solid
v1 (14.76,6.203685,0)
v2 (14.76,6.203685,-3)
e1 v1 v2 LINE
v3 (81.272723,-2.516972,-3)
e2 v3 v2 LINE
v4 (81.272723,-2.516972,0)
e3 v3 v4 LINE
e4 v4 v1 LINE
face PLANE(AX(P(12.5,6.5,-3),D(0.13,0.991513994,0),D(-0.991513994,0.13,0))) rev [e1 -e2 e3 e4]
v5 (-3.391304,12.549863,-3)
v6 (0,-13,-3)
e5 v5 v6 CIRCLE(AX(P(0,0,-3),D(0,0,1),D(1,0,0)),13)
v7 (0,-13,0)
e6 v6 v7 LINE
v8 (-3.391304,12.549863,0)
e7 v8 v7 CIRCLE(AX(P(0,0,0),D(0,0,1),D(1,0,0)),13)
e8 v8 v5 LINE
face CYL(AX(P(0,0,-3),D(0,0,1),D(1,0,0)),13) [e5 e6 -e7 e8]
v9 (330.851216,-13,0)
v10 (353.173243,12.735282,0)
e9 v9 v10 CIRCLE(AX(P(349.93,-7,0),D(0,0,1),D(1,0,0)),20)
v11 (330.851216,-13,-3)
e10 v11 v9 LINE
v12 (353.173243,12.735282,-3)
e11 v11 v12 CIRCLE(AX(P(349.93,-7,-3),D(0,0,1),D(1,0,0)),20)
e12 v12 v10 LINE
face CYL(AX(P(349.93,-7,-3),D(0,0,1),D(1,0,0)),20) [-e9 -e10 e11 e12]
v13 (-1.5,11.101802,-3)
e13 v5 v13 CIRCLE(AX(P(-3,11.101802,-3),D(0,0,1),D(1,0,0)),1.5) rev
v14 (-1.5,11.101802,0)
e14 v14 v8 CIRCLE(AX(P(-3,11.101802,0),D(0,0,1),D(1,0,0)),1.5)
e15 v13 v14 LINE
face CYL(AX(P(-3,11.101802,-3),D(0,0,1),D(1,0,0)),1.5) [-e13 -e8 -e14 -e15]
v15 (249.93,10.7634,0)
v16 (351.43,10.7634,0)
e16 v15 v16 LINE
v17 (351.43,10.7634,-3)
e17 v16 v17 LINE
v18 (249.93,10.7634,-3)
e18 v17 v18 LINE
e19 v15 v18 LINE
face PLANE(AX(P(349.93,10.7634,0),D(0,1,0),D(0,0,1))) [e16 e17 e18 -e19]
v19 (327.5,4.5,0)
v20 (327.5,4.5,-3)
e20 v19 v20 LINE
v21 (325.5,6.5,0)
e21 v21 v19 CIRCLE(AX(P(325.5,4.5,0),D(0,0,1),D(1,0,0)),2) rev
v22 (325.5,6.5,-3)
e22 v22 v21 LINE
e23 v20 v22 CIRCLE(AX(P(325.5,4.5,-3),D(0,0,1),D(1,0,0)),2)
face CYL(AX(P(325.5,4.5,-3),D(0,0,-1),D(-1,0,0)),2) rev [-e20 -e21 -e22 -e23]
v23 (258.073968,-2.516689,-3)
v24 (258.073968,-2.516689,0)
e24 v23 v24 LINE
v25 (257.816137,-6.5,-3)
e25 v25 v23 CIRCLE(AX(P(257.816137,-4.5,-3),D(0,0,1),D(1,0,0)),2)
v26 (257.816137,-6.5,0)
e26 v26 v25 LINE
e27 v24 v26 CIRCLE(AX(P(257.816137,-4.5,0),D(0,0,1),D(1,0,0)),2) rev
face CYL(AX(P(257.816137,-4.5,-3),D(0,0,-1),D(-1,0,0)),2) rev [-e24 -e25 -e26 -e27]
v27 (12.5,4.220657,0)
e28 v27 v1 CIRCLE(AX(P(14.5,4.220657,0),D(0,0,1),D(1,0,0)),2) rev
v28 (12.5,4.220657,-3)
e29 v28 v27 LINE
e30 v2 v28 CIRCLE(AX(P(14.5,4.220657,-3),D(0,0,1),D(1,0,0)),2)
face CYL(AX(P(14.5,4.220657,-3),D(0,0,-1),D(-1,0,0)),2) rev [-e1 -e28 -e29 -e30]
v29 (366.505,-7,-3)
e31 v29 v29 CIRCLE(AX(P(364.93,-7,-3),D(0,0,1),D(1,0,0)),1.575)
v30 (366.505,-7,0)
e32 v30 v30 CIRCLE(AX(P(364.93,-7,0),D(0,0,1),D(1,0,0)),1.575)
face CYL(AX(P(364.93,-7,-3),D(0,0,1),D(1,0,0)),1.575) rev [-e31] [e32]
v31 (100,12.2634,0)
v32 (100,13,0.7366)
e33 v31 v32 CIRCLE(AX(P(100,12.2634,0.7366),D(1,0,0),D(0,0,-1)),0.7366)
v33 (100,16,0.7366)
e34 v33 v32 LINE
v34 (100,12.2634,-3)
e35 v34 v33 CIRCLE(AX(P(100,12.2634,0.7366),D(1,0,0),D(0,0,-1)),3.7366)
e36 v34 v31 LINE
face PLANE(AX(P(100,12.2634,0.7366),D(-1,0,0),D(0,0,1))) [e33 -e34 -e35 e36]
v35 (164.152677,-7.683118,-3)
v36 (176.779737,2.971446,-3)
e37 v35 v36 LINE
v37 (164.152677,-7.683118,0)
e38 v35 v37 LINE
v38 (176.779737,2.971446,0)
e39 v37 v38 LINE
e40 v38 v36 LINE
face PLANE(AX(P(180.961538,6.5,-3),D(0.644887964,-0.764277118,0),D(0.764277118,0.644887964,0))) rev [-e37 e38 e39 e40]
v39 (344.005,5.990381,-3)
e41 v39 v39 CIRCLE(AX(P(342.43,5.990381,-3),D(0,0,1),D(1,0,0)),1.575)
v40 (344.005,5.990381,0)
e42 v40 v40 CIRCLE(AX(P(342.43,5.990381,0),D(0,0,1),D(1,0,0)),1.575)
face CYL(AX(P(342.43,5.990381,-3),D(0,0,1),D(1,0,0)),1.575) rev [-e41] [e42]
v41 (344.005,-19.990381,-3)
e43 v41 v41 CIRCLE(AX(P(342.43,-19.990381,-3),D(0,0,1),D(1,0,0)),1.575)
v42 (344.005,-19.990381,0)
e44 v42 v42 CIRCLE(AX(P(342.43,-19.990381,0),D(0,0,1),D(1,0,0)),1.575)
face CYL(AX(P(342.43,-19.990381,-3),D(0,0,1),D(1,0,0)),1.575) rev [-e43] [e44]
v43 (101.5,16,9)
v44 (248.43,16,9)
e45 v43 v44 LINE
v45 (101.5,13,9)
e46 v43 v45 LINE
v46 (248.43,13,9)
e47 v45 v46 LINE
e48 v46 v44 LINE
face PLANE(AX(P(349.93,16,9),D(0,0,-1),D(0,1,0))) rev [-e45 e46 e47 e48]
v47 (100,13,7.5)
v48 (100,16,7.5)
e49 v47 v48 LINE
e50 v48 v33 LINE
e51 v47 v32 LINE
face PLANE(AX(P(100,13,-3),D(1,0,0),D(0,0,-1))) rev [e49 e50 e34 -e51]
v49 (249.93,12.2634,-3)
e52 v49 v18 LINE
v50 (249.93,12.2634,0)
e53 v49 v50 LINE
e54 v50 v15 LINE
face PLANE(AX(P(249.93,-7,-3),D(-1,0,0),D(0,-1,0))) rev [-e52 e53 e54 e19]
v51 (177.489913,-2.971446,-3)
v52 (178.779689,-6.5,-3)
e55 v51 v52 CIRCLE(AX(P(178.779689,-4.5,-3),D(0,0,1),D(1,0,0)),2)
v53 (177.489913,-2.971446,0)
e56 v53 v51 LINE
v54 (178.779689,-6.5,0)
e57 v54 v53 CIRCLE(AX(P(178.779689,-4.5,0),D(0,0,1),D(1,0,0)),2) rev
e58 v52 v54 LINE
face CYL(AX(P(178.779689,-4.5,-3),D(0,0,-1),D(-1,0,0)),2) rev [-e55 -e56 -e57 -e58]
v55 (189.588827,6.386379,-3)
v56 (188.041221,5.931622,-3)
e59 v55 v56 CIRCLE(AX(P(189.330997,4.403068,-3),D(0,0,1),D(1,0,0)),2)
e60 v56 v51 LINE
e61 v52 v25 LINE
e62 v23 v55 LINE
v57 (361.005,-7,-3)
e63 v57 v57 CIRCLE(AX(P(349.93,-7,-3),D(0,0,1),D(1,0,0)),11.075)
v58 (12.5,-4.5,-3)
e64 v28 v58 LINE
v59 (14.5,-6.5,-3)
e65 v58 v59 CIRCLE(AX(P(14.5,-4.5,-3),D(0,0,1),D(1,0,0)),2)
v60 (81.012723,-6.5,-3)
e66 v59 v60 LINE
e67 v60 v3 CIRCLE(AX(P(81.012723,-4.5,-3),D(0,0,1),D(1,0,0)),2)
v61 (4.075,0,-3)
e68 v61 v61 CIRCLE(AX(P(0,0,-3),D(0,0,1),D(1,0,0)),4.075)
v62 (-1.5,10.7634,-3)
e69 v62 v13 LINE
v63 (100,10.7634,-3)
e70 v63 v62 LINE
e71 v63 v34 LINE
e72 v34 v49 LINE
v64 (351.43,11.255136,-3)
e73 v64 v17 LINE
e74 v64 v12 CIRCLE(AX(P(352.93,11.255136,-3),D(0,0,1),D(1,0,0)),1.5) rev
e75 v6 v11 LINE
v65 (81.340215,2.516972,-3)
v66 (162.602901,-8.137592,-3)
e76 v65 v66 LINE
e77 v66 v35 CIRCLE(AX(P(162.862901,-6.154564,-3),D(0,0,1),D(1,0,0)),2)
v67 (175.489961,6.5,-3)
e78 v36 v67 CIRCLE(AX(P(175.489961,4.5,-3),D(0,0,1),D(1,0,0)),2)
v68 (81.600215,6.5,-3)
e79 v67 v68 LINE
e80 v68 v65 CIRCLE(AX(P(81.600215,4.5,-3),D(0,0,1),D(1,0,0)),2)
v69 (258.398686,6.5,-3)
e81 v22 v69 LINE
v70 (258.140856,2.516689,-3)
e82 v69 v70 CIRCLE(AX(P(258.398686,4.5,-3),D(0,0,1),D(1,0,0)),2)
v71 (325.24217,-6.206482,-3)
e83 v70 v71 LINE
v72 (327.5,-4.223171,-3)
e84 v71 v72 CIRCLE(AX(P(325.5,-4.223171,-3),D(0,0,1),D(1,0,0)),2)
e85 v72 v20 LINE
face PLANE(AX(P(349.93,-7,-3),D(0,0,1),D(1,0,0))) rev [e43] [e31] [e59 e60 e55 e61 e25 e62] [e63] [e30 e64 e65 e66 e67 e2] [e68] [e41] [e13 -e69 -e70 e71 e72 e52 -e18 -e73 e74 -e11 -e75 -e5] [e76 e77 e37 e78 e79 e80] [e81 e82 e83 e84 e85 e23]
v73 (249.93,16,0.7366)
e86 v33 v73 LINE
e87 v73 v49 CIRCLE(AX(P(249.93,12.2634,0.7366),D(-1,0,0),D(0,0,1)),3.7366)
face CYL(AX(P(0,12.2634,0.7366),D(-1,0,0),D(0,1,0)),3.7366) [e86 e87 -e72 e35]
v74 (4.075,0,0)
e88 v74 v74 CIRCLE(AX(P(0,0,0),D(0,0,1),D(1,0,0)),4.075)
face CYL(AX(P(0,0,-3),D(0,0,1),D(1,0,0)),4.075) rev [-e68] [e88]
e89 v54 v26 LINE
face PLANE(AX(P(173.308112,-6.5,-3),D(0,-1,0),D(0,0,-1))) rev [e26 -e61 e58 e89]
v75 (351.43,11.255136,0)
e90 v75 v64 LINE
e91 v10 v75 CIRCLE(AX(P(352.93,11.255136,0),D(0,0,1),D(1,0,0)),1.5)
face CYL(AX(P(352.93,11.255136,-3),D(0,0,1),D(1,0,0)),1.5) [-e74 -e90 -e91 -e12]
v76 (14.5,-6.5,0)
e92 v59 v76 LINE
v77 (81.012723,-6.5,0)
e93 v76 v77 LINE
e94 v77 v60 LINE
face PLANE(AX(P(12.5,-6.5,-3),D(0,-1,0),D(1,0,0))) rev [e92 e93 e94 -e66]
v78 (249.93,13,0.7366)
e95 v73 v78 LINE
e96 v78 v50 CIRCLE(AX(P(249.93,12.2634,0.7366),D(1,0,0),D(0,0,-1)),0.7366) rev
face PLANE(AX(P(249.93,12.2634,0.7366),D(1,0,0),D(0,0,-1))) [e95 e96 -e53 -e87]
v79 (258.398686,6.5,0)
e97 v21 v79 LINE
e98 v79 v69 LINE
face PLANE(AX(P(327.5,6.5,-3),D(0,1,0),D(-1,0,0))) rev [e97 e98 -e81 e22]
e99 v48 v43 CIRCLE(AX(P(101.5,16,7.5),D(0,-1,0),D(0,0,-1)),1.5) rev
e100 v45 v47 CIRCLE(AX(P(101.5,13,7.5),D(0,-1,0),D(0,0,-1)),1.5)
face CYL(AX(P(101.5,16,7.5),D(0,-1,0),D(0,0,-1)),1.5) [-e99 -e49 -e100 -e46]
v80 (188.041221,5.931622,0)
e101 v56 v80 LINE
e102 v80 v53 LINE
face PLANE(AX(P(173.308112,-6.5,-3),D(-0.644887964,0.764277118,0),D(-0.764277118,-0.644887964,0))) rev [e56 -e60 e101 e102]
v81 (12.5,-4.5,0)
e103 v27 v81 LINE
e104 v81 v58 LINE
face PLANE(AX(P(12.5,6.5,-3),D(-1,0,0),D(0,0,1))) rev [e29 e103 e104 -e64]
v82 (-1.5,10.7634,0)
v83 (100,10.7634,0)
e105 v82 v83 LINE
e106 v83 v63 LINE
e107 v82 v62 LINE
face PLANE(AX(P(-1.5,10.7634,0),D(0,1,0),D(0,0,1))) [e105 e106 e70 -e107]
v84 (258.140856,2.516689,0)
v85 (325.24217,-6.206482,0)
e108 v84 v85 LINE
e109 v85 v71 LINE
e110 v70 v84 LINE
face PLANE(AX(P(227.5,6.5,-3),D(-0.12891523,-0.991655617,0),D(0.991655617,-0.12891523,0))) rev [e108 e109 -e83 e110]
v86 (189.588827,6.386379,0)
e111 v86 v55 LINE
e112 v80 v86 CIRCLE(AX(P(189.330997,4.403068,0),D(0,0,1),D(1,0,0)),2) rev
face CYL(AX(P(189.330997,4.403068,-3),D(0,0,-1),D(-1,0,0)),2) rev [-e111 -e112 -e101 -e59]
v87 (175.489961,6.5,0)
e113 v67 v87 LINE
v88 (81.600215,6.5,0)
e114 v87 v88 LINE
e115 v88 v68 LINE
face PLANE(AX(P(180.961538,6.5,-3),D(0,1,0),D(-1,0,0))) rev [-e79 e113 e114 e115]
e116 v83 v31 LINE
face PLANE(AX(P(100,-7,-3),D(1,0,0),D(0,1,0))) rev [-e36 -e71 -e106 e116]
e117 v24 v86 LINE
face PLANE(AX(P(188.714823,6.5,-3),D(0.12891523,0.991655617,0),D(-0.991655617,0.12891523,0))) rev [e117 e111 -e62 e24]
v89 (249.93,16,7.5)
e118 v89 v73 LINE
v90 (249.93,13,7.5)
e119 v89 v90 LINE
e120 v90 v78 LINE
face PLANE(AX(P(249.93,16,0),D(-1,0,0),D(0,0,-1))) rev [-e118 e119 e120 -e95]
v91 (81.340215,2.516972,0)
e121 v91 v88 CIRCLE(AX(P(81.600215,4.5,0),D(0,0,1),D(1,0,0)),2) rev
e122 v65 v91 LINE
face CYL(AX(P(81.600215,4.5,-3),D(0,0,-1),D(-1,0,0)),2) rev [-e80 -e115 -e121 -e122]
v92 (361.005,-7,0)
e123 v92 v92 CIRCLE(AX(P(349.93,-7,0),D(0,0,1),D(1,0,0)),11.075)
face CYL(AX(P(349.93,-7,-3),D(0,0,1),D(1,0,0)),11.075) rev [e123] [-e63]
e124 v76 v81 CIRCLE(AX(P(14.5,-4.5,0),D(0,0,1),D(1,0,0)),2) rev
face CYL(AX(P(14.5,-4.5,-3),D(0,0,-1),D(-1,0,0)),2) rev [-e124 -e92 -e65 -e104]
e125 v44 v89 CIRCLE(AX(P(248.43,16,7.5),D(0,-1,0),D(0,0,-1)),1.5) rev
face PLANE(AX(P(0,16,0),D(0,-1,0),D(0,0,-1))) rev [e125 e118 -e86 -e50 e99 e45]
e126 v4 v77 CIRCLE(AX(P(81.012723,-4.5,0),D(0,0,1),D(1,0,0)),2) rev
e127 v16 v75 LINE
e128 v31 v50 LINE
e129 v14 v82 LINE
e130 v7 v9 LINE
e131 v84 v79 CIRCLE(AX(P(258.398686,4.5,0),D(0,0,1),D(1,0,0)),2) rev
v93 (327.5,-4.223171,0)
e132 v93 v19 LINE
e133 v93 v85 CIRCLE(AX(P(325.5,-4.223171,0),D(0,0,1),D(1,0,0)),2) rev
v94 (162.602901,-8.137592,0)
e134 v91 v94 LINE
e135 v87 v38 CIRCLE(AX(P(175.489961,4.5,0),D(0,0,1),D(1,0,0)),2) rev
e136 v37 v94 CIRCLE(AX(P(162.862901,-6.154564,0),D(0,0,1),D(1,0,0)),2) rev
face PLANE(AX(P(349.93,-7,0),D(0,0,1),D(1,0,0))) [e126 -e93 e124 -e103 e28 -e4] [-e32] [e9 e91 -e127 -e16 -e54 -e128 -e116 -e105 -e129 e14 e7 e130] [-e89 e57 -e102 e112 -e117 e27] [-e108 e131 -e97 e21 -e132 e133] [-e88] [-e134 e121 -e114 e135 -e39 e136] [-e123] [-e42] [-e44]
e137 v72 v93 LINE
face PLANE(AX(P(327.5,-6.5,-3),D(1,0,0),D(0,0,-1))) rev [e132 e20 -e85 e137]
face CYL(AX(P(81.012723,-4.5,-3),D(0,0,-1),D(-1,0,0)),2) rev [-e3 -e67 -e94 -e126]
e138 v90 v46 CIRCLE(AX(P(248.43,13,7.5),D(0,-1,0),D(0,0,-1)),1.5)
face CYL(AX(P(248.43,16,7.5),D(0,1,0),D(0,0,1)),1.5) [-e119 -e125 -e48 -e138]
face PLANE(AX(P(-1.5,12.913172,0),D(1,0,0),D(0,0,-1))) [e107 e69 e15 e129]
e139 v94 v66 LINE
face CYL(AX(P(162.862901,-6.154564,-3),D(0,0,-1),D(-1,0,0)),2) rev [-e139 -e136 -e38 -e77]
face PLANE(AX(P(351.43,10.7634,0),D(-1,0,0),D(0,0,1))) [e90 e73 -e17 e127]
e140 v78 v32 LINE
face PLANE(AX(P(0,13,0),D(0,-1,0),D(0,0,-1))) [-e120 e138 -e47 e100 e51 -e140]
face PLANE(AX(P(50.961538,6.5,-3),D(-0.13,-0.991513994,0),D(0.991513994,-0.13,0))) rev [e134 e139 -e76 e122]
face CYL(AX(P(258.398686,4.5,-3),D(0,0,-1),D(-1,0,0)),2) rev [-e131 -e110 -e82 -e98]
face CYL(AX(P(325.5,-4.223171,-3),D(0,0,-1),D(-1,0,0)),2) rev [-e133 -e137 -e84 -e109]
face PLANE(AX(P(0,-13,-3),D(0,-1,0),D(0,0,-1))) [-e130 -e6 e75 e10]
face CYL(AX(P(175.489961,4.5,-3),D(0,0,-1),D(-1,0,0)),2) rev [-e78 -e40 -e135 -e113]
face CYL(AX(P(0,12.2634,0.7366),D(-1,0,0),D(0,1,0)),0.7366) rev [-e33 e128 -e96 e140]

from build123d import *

# Parameters (mm, degrees)
BASE_FLANGE1_DEPTH            = 3
EDGE_FLANGE2_STRIP_W          = 13.4732
EDGE_FLANGE2_STRIP_H          = 3
EDGE_FLANGE2_STRIP_CUT_DEPTH  = 349.93
EDGE_FLANGE2_RELIEF_W         = 14.9732
EDGE_FLANGE2_RELIEF_H         = 1.5
EDGE_FLANGE2_RELIEF_CUT_DEPTH = 3
EDGE_FLANGE2_DEPTH            = 349.93
CUT_EXTRUDE1_DEPTH            = 372.023186472
CUT_EXTRUDE1_DEPTH_BACK       = 372.023186472
SKETCH22_R                    = 4.075
SKETCH22_R_2                  = 11.075
SKETCH22_R_3                  = 1.575
CUT_EXTRUDE2_DEPTH            = 372.023186472
CUT_EXTRUDE2_DEPTH_BACK       = 372.023186472
FILLET1_R                     = 2
CUT_EXTRUDE3_DEPTH            = 372.023186472
CUT_EXTRUDE3_DEPTH_BACK       = 372.023186472
SKETCH24_W                    = 100
SKETCH24_H                    = 5.2366
FILLET2_R                     = 1.5


# Sheet-metal steps are written as plain solids
with BuildPart() as part:
    # Sketch1 → Base-Flange1 (new body)
    with BuildSketch(Plane.XY):
        with BuildLine():
            Line((0, 13), (349.93, 13))
            ThreePointArc((349.93, 13), (366.054515497, -18.832159566), (330.851215972, -13))
            Line((330.851215972, -13), (0, -13))
            ThreePointArc((0, -13), (-13, 0), (0, 13))
        make_face()
    extrude(amount=-BASE_FLANGE1_DEPTH)

    # Edge-Flange2 strip (across the edge) → Edge-Flange2 strip cut (cut)
    with BuildSketch(Plane(origin=(349.93, 13, 0), x_dir=(0, -1, 0), z_dir=(-1, 0, 0))):
        with Locations((-6, -1.5)):
            Rectangle(EDGE_FLANGE2_STRIP_W, EDGE_FLANGE2_STRIP_H)
    extrude(amount=EDGE_FLANGE2_STRIP_CUT_DEPTH, mode=Mode.SUBTRACT)

    # Edge-Flange2 relief (on the sheet) → Edge-Flange2 relief cut (cut)
    with BuildSketch(Plane(origin=(349.93, 12.2634, 0), x_dir=(0, -1, 0), z_dir=(0, 0, 1))):
        with Locations((-5.9866, 0.75)):
            Rectangle(EDGE_FLANGE2_RELIEF_W, EDGE_FLANGE2_RELIEF_H)
        with Locations((-5.9866, -350.68)):
            Rectangle(EDGE_FLANGE2_RELIEF_W, EDGE_FLANGE2_RELIEF_H)
    extrude(amount=-EDGE_FLANGE2_RELIEF_CUT_DEPTH, mode=Mode.SUBTRACT)

    # Edge-Flange2 section (across the edge) → Edge-Flange2 (add)
    with BuildSketch(Plane(origin=(349.93, 13, 0), x_dir=(0, -1, 0), z_dir=(-1, 0, 0))):
        with BuildLine():
            Line((-3, 0.7366), (-3, 9))
            Line((-3, 9), (0, 9))
            Line((0, 9), (0, 0.7366))
            ThreePointArc((0, 0.7366), (0.215745145, 0.215745145), (0.7366, 0))
            Line((0.7366, 0), (0.7366, -3))
            ThreePointArc((0.7366, -3), (-1.905575199, -1.905575199), (-3, 0.7366))
        make_face()
    extrude(amount=EDGE_FLANGE2_DEPTH)

    # Sketch22 → Cut-Extrude1 (cut, two sides: drawn at the far end of the back side and taken through both)
    with BuildSketch(Plane.XY.offset(-CUT_EXTRUDE1_DEPTH_BACK)):
        Circle(SKETCH22_R)
        with Locations((349.93, -7)):
            Circle(SKETCH22_R_2)
        with Locations((364.93, -7)):
            Circle(SKETCH22_R_3)
        with Locations((342.43, 5.990381057)):
            Circle(SKETCH22_R_3)
        with Locations((342.43, -19.990381057)):
            Circle(SKETCH22_R_3)
    extrude(amount=CUT_EXTRUDE1_DEPTH + CUT_EXTRUDE1_DEPTH_BACK, mode=Mode.SUBTRACT)

    # Sketch23 → Cut-Extrude2 (cut, two sides: drawn at the far end of the back side and taken through both)
    with BuildSketch(Plane.XY.offset(-CUT_EXTRUDE2_DEPTH_BACK)):
        Polygon((12.5, 6.5), (12.5, -6.5), (111.651399385, -6.5), align=None)
        Polygon((327.5, -6.5), (327.5, 6.5), (227.5, 6.5), align=None)
        Polygon((50.961538462, 6.5), (163.478075869, -8.252338296), (180.961538462, 6.5), align=None)
        Polygon((173.308112114, -6.5), (288.714823182, -6.5), (188.714823182, 6.5), align=None)
    extrude(amount=CUT_EXTRUDE2_DEPTH + CUT_EXTRUDE2_DEPTH_BACK, mode=Mode.SUBTRACT)

    # Fillet1
    fillet1_edges = [part.edges().sort_by_distance(p)[0] for p in [
        (327.5, -6.5, -1.5),
        (227.5, 6.5, -1.5),
        (327.5, 6.5, -1.5),
        (50.961538462, 6.5, -1.5),
        (180.961538462, 6.5, -1.5),
        (163.478075869, -8.252338296, -1.5),
        (173.308112114, -6.5, -1.5),
        (188.714823182, 6.5, -1.5),
        (288.714823182, -6.5, -1.5),
        (12.5, 6.5, -1.5),
        (111.651399385, -6.5, -1.5),
        (12.5, -6.5, -1.5),
        (349.93, 14.5, 9),
        (0, 14.5, 9),
    ]]
    fillet(fillet1_edges, radius=FILLET1_R)

    # Sketch24 → Cut-Extrude3 (cut, two sides: drawn at the far end of the back side and taken through both)
    with BuildSketch(Plane.XY.offset(-CUT_EXTRUDE3_DEPTH_BACK)):
        with Locations((50, 13.3817)):
            Rectangle(SKETCH24_W, SKETCH24_H)
        with Locations((299.93, 13.3817)):
            Rectangle(SKETCH24_W, SKETCH24_H)
    extrude(amount=CUT_EXTRUDE3_DEPTH + CUT_EXTRUDE3_DEPTH_BACK, mode=Mode.SUBTRACT)

    # Fillet2
    fillet2_edges = [part.edges().sort_by_distance(p)[0] for p in [
        (351.43, 12.943670675, -1.5),
        (-1.5, 12.91317157, -1.5),
        (100, 14.5, 9),
        (249.93, 14.5, 9),
    ]]
    fillet(fillet2_edges, radius=FILLET2_R)


solid = part.part
